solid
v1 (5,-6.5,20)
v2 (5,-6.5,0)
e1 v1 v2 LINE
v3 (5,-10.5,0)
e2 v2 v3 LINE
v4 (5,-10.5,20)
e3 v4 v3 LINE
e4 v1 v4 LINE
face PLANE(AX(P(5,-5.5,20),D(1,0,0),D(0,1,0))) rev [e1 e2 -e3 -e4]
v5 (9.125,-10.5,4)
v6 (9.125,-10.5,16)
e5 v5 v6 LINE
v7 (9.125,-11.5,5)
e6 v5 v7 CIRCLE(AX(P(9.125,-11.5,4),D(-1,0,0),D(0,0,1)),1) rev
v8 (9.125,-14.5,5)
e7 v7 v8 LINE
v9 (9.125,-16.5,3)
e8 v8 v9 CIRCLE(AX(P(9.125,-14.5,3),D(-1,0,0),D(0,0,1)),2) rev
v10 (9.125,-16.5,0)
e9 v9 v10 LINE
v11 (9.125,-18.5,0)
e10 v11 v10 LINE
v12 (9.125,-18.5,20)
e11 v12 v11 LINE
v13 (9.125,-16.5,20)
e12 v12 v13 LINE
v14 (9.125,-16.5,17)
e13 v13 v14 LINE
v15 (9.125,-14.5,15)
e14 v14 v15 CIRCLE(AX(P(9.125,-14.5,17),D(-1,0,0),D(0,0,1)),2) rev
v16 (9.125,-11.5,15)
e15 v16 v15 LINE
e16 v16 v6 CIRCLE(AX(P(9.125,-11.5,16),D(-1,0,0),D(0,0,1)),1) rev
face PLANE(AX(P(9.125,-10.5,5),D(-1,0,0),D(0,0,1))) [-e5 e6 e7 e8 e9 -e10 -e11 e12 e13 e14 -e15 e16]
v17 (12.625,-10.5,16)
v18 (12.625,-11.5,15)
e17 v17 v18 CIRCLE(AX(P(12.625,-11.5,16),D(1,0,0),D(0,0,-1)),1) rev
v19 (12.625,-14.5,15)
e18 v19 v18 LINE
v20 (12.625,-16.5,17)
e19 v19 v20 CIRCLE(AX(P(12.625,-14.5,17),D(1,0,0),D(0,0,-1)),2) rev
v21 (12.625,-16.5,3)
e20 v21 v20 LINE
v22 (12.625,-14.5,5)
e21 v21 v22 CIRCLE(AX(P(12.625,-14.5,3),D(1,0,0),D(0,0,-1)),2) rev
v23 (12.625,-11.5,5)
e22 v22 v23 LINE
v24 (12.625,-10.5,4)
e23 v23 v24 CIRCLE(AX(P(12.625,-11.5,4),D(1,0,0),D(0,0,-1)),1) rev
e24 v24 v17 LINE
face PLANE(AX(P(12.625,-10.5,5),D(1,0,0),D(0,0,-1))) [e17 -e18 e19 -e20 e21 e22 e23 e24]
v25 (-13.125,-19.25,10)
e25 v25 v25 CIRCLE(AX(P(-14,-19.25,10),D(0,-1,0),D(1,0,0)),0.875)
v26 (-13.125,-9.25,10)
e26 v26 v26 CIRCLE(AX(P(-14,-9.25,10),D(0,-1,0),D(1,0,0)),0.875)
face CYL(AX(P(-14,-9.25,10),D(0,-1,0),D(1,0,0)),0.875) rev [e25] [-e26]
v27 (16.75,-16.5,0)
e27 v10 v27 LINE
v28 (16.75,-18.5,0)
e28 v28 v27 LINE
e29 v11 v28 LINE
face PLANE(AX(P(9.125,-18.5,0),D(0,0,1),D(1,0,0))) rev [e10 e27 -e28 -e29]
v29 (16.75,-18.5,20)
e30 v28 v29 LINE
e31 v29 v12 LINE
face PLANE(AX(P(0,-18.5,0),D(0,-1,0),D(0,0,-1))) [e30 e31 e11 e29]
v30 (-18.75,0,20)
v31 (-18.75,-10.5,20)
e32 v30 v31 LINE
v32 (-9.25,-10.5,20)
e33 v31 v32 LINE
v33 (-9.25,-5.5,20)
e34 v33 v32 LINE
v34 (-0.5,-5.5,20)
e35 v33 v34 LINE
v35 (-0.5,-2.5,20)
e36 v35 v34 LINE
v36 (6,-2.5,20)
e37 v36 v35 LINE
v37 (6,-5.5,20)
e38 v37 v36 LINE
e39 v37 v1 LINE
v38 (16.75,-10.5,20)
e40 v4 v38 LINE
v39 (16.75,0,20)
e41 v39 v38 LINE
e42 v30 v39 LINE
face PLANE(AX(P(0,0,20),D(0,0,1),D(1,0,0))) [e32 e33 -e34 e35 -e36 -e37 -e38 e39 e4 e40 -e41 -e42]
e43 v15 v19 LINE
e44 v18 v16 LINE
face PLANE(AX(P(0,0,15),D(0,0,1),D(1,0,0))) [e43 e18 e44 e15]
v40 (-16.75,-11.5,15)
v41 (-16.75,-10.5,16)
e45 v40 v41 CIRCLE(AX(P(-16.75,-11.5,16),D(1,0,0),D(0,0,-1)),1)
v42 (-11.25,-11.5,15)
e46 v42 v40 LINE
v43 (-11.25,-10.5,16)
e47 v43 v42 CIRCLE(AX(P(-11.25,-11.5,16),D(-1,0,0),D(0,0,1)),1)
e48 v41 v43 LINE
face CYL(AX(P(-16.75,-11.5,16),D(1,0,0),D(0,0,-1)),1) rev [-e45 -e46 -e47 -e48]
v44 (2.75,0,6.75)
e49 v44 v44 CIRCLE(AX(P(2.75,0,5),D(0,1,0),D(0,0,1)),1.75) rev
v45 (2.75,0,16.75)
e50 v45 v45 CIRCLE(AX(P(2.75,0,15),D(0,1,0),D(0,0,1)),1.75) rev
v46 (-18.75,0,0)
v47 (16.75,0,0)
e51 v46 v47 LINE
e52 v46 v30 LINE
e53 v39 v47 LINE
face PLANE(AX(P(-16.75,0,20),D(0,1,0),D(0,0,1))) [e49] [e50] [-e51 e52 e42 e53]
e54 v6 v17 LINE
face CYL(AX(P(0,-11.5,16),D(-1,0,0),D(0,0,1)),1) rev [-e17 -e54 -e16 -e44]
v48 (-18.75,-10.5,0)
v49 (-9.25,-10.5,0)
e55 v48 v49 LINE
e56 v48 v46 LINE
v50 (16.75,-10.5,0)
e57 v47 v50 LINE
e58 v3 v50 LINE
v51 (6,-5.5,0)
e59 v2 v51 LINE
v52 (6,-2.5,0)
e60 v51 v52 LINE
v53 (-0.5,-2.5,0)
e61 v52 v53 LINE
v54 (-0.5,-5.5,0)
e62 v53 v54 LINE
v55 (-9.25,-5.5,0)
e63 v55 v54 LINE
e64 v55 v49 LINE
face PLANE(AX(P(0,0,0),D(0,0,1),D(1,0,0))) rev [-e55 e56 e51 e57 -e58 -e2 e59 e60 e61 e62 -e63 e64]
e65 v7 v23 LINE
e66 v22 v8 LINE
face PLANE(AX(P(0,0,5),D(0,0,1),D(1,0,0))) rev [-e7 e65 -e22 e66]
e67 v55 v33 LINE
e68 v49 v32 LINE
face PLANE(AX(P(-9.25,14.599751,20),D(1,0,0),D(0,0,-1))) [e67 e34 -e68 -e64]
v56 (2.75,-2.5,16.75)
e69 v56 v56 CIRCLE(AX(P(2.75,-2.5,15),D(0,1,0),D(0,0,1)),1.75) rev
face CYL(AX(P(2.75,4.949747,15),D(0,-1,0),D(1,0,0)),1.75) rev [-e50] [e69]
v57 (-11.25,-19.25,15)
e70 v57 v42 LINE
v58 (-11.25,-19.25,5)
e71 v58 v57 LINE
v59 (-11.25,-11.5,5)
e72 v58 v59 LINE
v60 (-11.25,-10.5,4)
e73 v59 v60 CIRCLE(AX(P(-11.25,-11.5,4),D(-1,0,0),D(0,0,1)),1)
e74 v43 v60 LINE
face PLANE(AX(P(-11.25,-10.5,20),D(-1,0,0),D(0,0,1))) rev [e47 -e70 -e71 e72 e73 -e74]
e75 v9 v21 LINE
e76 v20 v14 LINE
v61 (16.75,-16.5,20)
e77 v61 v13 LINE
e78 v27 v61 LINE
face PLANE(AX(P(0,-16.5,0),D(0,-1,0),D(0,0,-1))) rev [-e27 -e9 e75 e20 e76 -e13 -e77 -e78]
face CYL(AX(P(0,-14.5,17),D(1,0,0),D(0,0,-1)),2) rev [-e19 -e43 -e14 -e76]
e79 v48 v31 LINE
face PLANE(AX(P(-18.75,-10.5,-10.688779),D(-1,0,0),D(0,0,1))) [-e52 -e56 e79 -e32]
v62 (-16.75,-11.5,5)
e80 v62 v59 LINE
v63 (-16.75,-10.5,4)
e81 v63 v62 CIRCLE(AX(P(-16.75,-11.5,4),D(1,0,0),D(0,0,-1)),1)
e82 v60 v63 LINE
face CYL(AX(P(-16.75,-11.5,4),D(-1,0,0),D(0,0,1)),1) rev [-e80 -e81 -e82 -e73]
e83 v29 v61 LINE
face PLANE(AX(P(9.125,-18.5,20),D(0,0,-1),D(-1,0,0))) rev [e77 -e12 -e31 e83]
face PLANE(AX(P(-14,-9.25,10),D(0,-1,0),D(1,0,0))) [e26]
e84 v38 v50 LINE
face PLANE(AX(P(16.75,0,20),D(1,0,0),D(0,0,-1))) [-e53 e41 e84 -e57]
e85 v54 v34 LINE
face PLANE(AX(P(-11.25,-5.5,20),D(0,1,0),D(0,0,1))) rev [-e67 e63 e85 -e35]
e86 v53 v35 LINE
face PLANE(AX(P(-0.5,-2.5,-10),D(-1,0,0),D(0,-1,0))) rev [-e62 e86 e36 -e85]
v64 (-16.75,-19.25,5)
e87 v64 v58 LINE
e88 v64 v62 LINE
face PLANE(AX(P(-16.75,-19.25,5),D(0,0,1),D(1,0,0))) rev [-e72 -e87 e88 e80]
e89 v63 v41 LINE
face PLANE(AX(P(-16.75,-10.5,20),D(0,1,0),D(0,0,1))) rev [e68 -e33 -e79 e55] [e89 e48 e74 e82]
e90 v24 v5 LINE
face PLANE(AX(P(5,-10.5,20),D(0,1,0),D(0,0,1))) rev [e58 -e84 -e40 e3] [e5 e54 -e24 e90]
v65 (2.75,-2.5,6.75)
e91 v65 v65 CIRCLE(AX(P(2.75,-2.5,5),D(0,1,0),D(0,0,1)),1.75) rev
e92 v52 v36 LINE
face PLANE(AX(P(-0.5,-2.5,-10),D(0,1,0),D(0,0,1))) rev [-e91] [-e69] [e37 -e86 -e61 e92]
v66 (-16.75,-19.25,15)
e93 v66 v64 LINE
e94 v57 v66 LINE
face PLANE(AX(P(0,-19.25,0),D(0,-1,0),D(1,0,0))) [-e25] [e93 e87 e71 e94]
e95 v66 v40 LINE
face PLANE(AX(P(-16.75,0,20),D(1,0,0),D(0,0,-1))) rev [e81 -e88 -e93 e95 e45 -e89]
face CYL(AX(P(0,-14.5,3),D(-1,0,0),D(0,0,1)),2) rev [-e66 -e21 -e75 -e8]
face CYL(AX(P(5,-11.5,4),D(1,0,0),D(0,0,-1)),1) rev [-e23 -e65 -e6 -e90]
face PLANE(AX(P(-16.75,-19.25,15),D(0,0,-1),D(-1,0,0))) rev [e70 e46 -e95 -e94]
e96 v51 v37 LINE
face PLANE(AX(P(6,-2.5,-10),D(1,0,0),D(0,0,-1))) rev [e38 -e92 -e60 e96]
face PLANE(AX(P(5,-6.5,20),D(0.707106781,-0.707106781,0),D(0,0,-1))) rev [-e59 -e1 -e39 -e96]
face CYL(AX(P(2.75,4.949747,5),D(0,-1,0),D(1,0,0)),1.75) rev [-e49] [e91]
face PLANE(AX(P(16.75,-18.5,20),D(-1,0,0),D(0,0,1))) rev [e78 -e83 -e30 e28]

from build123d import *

# Parameters (mm, degrees)
BOSS_EXTRUDE1_DEPTH = 20
SKETCH2_R           = 1.75
CUT_EXTRUDE1_DEPTH  = 3.5
SKETCH4_W           = 5.5
SKETCH4_H           = 10
BOSS_EXTRUDE2_DEPTH = 8.75
SKETCH5_R           = 0.875
CUT_EXTRUDE2_DEPTH  = 10
SKETCH6_W           = 3.5
SKETCH6_H           = 6
BOSS_EXTRUDE3_DEPTH = 5
FILLET1_R           = 1
SKETCH8_W           = 6.5
SKETCH8_H           = 3
CUT_EXTRUDE3_DEPTH  = 30
CHAMFER1_SIZE       = 1
SKETCH10_W          = 2
SKETCH10_H          = 10.5
BOSS_EXTRUDE5_DEPTH = 20
SKETCH11_W          = 2
SKETCH11_H          = 20
BOSS_EXTRUDE6_DEPTH = 5
SKETCH12_W          = 7.625
SKETCH12_H          = 20
BOSS_EXTRUDE7_DEPTH = 2
FILLET2_R           = 2


with BuildPart() as part:
    # Sketch1 → Boss-Extrude1 (new body)
    with BuildSketch(Plane.XY):
        Polygon((-16.75, 0), (16.75, 0), (16.75, -10.5), (5, -10.5), (5, -5.5), (5, -3.5), (0.5, -3.5), (0.5, -5.5), (-11.25, -5.5), (-11.25, -10.5), (-16.75, -10.5), align=None)
    extrude(amount=BOSS_EXTRUDE1_DEPTH)

    # Sketch2 → Cut-Extrude1 (cut)
    with BuildSketch(Plane.XZ.offset(3.5)):
        with Locations((2.75, 15)):
            Circle(SKETCH2_R)
        with Locations((2.75, 5)):
            Circle(SKETCH2_R)
    extrude(amount=-CUT_EXTRUDE1_DEPTH, mode=Mode.SUBTRACT)

    # Sketch4 → Boss-Extrude2 (add)
    with BuildSketch(Plane.XZ.offset(10.5)):
        with Locations((-14, 10)):
            Rectangle(SKETCH4_W, SKETCH4_H)
    extrude(amount=BOSS_EXTRUDE2_DEPTH)

    # Sketch5 → Cut-Extrude2 (cut)
    with BuildSketch(Plane.XZ.offset(19.25)):
        with Locations((-14, 10)):
            Circle(SKETCH5_R)
    extrude(amount=-CUT_EXTRUDE2_DEPTH, mode=Mode.SUBTRACT)

    # Sketch6 → Boss-Extrude3 (add, symmetric)
    with BuildSketch(Plane.XY.offset(10)):
        with Locations((10.875, -13.5)):
            Rectangle(SKETCH6_W, SKETCH6_H)
    extrude(amount=BOSS_EXTRUDE3_DEPTH, both=True)

    # Fillet1
    fillet1_edges = [part.edges().sort_by_distance(p)[0] for p in [
        (-14, -10.5, 5),
        (-14, -10.5, 15),
        (10.875, -10.5, 5),
        (10.875, -10.5, 15),
    ]]
    fillet(fillet1_edges, radius=FILLET1_R)

    # Sketch8 → Cut-Extrude3 (cut)
    with BuildSketch(Plane.XY.offset(20)):
        with Locations((2.75, -4)):
            Rectangle(SKETCH8_W, SKETCH8_H)
    extrude(amount=-CUT_EXTRUDE3_DEPTH, mode=Mode.SUBTRACT)

    # Chamfer1
    chamfer1_edges = [part.edges().sort_by_distance(p)[0] for p in [
        (5, -5.5, 10),
    ]]
    chamfer(chamfer1_edges, length=CHAMFER1_SIZE - 0.0001)  # a hair under: the kernel refuses the full size

    # Sketch10 → Boss-Extrude5 (add)
    with BuildSketch(Plane.XY.offset(20)):
        with Locations((-17.75, -5.25)):
            Rectangle(SKETCH10_W, SKETCH10_H)
    extrude(amount=-BOSS_EXTRUDE5_DEPTH)

    # Sketch11 → Boss-Extrude6 (add)
    with BuildSketch(Plane.XZ.offset(10.5)):
        with Locations((-10.25, 10)):
            Rectangle(SKETCH11_W, SKETCH11_H)
    extrude(amount=-BOSS_EXTRUDE6_DEPTH)

    # Sketch12 → Boss-Extrude7 (add)
    with BuildSketch(Plane.XZ.offset(16.5)):
        with Locations((12.9375, 10)):
            Rectangle(SKETCH12_W, SKETCH12_H)
    extrude(amount=BOSS_EXTRUDE7_DEPTH)

    # Fillet2
    fillet2_edges = [part.edges().sort_by_distance(p)[0] for p in [
        (10.875, -16.5, 5),
        (10.875, -16.5, 15),
    ]]
    fillet(fillet2_edges, radius=FILLET2_R)


solid = part.part
